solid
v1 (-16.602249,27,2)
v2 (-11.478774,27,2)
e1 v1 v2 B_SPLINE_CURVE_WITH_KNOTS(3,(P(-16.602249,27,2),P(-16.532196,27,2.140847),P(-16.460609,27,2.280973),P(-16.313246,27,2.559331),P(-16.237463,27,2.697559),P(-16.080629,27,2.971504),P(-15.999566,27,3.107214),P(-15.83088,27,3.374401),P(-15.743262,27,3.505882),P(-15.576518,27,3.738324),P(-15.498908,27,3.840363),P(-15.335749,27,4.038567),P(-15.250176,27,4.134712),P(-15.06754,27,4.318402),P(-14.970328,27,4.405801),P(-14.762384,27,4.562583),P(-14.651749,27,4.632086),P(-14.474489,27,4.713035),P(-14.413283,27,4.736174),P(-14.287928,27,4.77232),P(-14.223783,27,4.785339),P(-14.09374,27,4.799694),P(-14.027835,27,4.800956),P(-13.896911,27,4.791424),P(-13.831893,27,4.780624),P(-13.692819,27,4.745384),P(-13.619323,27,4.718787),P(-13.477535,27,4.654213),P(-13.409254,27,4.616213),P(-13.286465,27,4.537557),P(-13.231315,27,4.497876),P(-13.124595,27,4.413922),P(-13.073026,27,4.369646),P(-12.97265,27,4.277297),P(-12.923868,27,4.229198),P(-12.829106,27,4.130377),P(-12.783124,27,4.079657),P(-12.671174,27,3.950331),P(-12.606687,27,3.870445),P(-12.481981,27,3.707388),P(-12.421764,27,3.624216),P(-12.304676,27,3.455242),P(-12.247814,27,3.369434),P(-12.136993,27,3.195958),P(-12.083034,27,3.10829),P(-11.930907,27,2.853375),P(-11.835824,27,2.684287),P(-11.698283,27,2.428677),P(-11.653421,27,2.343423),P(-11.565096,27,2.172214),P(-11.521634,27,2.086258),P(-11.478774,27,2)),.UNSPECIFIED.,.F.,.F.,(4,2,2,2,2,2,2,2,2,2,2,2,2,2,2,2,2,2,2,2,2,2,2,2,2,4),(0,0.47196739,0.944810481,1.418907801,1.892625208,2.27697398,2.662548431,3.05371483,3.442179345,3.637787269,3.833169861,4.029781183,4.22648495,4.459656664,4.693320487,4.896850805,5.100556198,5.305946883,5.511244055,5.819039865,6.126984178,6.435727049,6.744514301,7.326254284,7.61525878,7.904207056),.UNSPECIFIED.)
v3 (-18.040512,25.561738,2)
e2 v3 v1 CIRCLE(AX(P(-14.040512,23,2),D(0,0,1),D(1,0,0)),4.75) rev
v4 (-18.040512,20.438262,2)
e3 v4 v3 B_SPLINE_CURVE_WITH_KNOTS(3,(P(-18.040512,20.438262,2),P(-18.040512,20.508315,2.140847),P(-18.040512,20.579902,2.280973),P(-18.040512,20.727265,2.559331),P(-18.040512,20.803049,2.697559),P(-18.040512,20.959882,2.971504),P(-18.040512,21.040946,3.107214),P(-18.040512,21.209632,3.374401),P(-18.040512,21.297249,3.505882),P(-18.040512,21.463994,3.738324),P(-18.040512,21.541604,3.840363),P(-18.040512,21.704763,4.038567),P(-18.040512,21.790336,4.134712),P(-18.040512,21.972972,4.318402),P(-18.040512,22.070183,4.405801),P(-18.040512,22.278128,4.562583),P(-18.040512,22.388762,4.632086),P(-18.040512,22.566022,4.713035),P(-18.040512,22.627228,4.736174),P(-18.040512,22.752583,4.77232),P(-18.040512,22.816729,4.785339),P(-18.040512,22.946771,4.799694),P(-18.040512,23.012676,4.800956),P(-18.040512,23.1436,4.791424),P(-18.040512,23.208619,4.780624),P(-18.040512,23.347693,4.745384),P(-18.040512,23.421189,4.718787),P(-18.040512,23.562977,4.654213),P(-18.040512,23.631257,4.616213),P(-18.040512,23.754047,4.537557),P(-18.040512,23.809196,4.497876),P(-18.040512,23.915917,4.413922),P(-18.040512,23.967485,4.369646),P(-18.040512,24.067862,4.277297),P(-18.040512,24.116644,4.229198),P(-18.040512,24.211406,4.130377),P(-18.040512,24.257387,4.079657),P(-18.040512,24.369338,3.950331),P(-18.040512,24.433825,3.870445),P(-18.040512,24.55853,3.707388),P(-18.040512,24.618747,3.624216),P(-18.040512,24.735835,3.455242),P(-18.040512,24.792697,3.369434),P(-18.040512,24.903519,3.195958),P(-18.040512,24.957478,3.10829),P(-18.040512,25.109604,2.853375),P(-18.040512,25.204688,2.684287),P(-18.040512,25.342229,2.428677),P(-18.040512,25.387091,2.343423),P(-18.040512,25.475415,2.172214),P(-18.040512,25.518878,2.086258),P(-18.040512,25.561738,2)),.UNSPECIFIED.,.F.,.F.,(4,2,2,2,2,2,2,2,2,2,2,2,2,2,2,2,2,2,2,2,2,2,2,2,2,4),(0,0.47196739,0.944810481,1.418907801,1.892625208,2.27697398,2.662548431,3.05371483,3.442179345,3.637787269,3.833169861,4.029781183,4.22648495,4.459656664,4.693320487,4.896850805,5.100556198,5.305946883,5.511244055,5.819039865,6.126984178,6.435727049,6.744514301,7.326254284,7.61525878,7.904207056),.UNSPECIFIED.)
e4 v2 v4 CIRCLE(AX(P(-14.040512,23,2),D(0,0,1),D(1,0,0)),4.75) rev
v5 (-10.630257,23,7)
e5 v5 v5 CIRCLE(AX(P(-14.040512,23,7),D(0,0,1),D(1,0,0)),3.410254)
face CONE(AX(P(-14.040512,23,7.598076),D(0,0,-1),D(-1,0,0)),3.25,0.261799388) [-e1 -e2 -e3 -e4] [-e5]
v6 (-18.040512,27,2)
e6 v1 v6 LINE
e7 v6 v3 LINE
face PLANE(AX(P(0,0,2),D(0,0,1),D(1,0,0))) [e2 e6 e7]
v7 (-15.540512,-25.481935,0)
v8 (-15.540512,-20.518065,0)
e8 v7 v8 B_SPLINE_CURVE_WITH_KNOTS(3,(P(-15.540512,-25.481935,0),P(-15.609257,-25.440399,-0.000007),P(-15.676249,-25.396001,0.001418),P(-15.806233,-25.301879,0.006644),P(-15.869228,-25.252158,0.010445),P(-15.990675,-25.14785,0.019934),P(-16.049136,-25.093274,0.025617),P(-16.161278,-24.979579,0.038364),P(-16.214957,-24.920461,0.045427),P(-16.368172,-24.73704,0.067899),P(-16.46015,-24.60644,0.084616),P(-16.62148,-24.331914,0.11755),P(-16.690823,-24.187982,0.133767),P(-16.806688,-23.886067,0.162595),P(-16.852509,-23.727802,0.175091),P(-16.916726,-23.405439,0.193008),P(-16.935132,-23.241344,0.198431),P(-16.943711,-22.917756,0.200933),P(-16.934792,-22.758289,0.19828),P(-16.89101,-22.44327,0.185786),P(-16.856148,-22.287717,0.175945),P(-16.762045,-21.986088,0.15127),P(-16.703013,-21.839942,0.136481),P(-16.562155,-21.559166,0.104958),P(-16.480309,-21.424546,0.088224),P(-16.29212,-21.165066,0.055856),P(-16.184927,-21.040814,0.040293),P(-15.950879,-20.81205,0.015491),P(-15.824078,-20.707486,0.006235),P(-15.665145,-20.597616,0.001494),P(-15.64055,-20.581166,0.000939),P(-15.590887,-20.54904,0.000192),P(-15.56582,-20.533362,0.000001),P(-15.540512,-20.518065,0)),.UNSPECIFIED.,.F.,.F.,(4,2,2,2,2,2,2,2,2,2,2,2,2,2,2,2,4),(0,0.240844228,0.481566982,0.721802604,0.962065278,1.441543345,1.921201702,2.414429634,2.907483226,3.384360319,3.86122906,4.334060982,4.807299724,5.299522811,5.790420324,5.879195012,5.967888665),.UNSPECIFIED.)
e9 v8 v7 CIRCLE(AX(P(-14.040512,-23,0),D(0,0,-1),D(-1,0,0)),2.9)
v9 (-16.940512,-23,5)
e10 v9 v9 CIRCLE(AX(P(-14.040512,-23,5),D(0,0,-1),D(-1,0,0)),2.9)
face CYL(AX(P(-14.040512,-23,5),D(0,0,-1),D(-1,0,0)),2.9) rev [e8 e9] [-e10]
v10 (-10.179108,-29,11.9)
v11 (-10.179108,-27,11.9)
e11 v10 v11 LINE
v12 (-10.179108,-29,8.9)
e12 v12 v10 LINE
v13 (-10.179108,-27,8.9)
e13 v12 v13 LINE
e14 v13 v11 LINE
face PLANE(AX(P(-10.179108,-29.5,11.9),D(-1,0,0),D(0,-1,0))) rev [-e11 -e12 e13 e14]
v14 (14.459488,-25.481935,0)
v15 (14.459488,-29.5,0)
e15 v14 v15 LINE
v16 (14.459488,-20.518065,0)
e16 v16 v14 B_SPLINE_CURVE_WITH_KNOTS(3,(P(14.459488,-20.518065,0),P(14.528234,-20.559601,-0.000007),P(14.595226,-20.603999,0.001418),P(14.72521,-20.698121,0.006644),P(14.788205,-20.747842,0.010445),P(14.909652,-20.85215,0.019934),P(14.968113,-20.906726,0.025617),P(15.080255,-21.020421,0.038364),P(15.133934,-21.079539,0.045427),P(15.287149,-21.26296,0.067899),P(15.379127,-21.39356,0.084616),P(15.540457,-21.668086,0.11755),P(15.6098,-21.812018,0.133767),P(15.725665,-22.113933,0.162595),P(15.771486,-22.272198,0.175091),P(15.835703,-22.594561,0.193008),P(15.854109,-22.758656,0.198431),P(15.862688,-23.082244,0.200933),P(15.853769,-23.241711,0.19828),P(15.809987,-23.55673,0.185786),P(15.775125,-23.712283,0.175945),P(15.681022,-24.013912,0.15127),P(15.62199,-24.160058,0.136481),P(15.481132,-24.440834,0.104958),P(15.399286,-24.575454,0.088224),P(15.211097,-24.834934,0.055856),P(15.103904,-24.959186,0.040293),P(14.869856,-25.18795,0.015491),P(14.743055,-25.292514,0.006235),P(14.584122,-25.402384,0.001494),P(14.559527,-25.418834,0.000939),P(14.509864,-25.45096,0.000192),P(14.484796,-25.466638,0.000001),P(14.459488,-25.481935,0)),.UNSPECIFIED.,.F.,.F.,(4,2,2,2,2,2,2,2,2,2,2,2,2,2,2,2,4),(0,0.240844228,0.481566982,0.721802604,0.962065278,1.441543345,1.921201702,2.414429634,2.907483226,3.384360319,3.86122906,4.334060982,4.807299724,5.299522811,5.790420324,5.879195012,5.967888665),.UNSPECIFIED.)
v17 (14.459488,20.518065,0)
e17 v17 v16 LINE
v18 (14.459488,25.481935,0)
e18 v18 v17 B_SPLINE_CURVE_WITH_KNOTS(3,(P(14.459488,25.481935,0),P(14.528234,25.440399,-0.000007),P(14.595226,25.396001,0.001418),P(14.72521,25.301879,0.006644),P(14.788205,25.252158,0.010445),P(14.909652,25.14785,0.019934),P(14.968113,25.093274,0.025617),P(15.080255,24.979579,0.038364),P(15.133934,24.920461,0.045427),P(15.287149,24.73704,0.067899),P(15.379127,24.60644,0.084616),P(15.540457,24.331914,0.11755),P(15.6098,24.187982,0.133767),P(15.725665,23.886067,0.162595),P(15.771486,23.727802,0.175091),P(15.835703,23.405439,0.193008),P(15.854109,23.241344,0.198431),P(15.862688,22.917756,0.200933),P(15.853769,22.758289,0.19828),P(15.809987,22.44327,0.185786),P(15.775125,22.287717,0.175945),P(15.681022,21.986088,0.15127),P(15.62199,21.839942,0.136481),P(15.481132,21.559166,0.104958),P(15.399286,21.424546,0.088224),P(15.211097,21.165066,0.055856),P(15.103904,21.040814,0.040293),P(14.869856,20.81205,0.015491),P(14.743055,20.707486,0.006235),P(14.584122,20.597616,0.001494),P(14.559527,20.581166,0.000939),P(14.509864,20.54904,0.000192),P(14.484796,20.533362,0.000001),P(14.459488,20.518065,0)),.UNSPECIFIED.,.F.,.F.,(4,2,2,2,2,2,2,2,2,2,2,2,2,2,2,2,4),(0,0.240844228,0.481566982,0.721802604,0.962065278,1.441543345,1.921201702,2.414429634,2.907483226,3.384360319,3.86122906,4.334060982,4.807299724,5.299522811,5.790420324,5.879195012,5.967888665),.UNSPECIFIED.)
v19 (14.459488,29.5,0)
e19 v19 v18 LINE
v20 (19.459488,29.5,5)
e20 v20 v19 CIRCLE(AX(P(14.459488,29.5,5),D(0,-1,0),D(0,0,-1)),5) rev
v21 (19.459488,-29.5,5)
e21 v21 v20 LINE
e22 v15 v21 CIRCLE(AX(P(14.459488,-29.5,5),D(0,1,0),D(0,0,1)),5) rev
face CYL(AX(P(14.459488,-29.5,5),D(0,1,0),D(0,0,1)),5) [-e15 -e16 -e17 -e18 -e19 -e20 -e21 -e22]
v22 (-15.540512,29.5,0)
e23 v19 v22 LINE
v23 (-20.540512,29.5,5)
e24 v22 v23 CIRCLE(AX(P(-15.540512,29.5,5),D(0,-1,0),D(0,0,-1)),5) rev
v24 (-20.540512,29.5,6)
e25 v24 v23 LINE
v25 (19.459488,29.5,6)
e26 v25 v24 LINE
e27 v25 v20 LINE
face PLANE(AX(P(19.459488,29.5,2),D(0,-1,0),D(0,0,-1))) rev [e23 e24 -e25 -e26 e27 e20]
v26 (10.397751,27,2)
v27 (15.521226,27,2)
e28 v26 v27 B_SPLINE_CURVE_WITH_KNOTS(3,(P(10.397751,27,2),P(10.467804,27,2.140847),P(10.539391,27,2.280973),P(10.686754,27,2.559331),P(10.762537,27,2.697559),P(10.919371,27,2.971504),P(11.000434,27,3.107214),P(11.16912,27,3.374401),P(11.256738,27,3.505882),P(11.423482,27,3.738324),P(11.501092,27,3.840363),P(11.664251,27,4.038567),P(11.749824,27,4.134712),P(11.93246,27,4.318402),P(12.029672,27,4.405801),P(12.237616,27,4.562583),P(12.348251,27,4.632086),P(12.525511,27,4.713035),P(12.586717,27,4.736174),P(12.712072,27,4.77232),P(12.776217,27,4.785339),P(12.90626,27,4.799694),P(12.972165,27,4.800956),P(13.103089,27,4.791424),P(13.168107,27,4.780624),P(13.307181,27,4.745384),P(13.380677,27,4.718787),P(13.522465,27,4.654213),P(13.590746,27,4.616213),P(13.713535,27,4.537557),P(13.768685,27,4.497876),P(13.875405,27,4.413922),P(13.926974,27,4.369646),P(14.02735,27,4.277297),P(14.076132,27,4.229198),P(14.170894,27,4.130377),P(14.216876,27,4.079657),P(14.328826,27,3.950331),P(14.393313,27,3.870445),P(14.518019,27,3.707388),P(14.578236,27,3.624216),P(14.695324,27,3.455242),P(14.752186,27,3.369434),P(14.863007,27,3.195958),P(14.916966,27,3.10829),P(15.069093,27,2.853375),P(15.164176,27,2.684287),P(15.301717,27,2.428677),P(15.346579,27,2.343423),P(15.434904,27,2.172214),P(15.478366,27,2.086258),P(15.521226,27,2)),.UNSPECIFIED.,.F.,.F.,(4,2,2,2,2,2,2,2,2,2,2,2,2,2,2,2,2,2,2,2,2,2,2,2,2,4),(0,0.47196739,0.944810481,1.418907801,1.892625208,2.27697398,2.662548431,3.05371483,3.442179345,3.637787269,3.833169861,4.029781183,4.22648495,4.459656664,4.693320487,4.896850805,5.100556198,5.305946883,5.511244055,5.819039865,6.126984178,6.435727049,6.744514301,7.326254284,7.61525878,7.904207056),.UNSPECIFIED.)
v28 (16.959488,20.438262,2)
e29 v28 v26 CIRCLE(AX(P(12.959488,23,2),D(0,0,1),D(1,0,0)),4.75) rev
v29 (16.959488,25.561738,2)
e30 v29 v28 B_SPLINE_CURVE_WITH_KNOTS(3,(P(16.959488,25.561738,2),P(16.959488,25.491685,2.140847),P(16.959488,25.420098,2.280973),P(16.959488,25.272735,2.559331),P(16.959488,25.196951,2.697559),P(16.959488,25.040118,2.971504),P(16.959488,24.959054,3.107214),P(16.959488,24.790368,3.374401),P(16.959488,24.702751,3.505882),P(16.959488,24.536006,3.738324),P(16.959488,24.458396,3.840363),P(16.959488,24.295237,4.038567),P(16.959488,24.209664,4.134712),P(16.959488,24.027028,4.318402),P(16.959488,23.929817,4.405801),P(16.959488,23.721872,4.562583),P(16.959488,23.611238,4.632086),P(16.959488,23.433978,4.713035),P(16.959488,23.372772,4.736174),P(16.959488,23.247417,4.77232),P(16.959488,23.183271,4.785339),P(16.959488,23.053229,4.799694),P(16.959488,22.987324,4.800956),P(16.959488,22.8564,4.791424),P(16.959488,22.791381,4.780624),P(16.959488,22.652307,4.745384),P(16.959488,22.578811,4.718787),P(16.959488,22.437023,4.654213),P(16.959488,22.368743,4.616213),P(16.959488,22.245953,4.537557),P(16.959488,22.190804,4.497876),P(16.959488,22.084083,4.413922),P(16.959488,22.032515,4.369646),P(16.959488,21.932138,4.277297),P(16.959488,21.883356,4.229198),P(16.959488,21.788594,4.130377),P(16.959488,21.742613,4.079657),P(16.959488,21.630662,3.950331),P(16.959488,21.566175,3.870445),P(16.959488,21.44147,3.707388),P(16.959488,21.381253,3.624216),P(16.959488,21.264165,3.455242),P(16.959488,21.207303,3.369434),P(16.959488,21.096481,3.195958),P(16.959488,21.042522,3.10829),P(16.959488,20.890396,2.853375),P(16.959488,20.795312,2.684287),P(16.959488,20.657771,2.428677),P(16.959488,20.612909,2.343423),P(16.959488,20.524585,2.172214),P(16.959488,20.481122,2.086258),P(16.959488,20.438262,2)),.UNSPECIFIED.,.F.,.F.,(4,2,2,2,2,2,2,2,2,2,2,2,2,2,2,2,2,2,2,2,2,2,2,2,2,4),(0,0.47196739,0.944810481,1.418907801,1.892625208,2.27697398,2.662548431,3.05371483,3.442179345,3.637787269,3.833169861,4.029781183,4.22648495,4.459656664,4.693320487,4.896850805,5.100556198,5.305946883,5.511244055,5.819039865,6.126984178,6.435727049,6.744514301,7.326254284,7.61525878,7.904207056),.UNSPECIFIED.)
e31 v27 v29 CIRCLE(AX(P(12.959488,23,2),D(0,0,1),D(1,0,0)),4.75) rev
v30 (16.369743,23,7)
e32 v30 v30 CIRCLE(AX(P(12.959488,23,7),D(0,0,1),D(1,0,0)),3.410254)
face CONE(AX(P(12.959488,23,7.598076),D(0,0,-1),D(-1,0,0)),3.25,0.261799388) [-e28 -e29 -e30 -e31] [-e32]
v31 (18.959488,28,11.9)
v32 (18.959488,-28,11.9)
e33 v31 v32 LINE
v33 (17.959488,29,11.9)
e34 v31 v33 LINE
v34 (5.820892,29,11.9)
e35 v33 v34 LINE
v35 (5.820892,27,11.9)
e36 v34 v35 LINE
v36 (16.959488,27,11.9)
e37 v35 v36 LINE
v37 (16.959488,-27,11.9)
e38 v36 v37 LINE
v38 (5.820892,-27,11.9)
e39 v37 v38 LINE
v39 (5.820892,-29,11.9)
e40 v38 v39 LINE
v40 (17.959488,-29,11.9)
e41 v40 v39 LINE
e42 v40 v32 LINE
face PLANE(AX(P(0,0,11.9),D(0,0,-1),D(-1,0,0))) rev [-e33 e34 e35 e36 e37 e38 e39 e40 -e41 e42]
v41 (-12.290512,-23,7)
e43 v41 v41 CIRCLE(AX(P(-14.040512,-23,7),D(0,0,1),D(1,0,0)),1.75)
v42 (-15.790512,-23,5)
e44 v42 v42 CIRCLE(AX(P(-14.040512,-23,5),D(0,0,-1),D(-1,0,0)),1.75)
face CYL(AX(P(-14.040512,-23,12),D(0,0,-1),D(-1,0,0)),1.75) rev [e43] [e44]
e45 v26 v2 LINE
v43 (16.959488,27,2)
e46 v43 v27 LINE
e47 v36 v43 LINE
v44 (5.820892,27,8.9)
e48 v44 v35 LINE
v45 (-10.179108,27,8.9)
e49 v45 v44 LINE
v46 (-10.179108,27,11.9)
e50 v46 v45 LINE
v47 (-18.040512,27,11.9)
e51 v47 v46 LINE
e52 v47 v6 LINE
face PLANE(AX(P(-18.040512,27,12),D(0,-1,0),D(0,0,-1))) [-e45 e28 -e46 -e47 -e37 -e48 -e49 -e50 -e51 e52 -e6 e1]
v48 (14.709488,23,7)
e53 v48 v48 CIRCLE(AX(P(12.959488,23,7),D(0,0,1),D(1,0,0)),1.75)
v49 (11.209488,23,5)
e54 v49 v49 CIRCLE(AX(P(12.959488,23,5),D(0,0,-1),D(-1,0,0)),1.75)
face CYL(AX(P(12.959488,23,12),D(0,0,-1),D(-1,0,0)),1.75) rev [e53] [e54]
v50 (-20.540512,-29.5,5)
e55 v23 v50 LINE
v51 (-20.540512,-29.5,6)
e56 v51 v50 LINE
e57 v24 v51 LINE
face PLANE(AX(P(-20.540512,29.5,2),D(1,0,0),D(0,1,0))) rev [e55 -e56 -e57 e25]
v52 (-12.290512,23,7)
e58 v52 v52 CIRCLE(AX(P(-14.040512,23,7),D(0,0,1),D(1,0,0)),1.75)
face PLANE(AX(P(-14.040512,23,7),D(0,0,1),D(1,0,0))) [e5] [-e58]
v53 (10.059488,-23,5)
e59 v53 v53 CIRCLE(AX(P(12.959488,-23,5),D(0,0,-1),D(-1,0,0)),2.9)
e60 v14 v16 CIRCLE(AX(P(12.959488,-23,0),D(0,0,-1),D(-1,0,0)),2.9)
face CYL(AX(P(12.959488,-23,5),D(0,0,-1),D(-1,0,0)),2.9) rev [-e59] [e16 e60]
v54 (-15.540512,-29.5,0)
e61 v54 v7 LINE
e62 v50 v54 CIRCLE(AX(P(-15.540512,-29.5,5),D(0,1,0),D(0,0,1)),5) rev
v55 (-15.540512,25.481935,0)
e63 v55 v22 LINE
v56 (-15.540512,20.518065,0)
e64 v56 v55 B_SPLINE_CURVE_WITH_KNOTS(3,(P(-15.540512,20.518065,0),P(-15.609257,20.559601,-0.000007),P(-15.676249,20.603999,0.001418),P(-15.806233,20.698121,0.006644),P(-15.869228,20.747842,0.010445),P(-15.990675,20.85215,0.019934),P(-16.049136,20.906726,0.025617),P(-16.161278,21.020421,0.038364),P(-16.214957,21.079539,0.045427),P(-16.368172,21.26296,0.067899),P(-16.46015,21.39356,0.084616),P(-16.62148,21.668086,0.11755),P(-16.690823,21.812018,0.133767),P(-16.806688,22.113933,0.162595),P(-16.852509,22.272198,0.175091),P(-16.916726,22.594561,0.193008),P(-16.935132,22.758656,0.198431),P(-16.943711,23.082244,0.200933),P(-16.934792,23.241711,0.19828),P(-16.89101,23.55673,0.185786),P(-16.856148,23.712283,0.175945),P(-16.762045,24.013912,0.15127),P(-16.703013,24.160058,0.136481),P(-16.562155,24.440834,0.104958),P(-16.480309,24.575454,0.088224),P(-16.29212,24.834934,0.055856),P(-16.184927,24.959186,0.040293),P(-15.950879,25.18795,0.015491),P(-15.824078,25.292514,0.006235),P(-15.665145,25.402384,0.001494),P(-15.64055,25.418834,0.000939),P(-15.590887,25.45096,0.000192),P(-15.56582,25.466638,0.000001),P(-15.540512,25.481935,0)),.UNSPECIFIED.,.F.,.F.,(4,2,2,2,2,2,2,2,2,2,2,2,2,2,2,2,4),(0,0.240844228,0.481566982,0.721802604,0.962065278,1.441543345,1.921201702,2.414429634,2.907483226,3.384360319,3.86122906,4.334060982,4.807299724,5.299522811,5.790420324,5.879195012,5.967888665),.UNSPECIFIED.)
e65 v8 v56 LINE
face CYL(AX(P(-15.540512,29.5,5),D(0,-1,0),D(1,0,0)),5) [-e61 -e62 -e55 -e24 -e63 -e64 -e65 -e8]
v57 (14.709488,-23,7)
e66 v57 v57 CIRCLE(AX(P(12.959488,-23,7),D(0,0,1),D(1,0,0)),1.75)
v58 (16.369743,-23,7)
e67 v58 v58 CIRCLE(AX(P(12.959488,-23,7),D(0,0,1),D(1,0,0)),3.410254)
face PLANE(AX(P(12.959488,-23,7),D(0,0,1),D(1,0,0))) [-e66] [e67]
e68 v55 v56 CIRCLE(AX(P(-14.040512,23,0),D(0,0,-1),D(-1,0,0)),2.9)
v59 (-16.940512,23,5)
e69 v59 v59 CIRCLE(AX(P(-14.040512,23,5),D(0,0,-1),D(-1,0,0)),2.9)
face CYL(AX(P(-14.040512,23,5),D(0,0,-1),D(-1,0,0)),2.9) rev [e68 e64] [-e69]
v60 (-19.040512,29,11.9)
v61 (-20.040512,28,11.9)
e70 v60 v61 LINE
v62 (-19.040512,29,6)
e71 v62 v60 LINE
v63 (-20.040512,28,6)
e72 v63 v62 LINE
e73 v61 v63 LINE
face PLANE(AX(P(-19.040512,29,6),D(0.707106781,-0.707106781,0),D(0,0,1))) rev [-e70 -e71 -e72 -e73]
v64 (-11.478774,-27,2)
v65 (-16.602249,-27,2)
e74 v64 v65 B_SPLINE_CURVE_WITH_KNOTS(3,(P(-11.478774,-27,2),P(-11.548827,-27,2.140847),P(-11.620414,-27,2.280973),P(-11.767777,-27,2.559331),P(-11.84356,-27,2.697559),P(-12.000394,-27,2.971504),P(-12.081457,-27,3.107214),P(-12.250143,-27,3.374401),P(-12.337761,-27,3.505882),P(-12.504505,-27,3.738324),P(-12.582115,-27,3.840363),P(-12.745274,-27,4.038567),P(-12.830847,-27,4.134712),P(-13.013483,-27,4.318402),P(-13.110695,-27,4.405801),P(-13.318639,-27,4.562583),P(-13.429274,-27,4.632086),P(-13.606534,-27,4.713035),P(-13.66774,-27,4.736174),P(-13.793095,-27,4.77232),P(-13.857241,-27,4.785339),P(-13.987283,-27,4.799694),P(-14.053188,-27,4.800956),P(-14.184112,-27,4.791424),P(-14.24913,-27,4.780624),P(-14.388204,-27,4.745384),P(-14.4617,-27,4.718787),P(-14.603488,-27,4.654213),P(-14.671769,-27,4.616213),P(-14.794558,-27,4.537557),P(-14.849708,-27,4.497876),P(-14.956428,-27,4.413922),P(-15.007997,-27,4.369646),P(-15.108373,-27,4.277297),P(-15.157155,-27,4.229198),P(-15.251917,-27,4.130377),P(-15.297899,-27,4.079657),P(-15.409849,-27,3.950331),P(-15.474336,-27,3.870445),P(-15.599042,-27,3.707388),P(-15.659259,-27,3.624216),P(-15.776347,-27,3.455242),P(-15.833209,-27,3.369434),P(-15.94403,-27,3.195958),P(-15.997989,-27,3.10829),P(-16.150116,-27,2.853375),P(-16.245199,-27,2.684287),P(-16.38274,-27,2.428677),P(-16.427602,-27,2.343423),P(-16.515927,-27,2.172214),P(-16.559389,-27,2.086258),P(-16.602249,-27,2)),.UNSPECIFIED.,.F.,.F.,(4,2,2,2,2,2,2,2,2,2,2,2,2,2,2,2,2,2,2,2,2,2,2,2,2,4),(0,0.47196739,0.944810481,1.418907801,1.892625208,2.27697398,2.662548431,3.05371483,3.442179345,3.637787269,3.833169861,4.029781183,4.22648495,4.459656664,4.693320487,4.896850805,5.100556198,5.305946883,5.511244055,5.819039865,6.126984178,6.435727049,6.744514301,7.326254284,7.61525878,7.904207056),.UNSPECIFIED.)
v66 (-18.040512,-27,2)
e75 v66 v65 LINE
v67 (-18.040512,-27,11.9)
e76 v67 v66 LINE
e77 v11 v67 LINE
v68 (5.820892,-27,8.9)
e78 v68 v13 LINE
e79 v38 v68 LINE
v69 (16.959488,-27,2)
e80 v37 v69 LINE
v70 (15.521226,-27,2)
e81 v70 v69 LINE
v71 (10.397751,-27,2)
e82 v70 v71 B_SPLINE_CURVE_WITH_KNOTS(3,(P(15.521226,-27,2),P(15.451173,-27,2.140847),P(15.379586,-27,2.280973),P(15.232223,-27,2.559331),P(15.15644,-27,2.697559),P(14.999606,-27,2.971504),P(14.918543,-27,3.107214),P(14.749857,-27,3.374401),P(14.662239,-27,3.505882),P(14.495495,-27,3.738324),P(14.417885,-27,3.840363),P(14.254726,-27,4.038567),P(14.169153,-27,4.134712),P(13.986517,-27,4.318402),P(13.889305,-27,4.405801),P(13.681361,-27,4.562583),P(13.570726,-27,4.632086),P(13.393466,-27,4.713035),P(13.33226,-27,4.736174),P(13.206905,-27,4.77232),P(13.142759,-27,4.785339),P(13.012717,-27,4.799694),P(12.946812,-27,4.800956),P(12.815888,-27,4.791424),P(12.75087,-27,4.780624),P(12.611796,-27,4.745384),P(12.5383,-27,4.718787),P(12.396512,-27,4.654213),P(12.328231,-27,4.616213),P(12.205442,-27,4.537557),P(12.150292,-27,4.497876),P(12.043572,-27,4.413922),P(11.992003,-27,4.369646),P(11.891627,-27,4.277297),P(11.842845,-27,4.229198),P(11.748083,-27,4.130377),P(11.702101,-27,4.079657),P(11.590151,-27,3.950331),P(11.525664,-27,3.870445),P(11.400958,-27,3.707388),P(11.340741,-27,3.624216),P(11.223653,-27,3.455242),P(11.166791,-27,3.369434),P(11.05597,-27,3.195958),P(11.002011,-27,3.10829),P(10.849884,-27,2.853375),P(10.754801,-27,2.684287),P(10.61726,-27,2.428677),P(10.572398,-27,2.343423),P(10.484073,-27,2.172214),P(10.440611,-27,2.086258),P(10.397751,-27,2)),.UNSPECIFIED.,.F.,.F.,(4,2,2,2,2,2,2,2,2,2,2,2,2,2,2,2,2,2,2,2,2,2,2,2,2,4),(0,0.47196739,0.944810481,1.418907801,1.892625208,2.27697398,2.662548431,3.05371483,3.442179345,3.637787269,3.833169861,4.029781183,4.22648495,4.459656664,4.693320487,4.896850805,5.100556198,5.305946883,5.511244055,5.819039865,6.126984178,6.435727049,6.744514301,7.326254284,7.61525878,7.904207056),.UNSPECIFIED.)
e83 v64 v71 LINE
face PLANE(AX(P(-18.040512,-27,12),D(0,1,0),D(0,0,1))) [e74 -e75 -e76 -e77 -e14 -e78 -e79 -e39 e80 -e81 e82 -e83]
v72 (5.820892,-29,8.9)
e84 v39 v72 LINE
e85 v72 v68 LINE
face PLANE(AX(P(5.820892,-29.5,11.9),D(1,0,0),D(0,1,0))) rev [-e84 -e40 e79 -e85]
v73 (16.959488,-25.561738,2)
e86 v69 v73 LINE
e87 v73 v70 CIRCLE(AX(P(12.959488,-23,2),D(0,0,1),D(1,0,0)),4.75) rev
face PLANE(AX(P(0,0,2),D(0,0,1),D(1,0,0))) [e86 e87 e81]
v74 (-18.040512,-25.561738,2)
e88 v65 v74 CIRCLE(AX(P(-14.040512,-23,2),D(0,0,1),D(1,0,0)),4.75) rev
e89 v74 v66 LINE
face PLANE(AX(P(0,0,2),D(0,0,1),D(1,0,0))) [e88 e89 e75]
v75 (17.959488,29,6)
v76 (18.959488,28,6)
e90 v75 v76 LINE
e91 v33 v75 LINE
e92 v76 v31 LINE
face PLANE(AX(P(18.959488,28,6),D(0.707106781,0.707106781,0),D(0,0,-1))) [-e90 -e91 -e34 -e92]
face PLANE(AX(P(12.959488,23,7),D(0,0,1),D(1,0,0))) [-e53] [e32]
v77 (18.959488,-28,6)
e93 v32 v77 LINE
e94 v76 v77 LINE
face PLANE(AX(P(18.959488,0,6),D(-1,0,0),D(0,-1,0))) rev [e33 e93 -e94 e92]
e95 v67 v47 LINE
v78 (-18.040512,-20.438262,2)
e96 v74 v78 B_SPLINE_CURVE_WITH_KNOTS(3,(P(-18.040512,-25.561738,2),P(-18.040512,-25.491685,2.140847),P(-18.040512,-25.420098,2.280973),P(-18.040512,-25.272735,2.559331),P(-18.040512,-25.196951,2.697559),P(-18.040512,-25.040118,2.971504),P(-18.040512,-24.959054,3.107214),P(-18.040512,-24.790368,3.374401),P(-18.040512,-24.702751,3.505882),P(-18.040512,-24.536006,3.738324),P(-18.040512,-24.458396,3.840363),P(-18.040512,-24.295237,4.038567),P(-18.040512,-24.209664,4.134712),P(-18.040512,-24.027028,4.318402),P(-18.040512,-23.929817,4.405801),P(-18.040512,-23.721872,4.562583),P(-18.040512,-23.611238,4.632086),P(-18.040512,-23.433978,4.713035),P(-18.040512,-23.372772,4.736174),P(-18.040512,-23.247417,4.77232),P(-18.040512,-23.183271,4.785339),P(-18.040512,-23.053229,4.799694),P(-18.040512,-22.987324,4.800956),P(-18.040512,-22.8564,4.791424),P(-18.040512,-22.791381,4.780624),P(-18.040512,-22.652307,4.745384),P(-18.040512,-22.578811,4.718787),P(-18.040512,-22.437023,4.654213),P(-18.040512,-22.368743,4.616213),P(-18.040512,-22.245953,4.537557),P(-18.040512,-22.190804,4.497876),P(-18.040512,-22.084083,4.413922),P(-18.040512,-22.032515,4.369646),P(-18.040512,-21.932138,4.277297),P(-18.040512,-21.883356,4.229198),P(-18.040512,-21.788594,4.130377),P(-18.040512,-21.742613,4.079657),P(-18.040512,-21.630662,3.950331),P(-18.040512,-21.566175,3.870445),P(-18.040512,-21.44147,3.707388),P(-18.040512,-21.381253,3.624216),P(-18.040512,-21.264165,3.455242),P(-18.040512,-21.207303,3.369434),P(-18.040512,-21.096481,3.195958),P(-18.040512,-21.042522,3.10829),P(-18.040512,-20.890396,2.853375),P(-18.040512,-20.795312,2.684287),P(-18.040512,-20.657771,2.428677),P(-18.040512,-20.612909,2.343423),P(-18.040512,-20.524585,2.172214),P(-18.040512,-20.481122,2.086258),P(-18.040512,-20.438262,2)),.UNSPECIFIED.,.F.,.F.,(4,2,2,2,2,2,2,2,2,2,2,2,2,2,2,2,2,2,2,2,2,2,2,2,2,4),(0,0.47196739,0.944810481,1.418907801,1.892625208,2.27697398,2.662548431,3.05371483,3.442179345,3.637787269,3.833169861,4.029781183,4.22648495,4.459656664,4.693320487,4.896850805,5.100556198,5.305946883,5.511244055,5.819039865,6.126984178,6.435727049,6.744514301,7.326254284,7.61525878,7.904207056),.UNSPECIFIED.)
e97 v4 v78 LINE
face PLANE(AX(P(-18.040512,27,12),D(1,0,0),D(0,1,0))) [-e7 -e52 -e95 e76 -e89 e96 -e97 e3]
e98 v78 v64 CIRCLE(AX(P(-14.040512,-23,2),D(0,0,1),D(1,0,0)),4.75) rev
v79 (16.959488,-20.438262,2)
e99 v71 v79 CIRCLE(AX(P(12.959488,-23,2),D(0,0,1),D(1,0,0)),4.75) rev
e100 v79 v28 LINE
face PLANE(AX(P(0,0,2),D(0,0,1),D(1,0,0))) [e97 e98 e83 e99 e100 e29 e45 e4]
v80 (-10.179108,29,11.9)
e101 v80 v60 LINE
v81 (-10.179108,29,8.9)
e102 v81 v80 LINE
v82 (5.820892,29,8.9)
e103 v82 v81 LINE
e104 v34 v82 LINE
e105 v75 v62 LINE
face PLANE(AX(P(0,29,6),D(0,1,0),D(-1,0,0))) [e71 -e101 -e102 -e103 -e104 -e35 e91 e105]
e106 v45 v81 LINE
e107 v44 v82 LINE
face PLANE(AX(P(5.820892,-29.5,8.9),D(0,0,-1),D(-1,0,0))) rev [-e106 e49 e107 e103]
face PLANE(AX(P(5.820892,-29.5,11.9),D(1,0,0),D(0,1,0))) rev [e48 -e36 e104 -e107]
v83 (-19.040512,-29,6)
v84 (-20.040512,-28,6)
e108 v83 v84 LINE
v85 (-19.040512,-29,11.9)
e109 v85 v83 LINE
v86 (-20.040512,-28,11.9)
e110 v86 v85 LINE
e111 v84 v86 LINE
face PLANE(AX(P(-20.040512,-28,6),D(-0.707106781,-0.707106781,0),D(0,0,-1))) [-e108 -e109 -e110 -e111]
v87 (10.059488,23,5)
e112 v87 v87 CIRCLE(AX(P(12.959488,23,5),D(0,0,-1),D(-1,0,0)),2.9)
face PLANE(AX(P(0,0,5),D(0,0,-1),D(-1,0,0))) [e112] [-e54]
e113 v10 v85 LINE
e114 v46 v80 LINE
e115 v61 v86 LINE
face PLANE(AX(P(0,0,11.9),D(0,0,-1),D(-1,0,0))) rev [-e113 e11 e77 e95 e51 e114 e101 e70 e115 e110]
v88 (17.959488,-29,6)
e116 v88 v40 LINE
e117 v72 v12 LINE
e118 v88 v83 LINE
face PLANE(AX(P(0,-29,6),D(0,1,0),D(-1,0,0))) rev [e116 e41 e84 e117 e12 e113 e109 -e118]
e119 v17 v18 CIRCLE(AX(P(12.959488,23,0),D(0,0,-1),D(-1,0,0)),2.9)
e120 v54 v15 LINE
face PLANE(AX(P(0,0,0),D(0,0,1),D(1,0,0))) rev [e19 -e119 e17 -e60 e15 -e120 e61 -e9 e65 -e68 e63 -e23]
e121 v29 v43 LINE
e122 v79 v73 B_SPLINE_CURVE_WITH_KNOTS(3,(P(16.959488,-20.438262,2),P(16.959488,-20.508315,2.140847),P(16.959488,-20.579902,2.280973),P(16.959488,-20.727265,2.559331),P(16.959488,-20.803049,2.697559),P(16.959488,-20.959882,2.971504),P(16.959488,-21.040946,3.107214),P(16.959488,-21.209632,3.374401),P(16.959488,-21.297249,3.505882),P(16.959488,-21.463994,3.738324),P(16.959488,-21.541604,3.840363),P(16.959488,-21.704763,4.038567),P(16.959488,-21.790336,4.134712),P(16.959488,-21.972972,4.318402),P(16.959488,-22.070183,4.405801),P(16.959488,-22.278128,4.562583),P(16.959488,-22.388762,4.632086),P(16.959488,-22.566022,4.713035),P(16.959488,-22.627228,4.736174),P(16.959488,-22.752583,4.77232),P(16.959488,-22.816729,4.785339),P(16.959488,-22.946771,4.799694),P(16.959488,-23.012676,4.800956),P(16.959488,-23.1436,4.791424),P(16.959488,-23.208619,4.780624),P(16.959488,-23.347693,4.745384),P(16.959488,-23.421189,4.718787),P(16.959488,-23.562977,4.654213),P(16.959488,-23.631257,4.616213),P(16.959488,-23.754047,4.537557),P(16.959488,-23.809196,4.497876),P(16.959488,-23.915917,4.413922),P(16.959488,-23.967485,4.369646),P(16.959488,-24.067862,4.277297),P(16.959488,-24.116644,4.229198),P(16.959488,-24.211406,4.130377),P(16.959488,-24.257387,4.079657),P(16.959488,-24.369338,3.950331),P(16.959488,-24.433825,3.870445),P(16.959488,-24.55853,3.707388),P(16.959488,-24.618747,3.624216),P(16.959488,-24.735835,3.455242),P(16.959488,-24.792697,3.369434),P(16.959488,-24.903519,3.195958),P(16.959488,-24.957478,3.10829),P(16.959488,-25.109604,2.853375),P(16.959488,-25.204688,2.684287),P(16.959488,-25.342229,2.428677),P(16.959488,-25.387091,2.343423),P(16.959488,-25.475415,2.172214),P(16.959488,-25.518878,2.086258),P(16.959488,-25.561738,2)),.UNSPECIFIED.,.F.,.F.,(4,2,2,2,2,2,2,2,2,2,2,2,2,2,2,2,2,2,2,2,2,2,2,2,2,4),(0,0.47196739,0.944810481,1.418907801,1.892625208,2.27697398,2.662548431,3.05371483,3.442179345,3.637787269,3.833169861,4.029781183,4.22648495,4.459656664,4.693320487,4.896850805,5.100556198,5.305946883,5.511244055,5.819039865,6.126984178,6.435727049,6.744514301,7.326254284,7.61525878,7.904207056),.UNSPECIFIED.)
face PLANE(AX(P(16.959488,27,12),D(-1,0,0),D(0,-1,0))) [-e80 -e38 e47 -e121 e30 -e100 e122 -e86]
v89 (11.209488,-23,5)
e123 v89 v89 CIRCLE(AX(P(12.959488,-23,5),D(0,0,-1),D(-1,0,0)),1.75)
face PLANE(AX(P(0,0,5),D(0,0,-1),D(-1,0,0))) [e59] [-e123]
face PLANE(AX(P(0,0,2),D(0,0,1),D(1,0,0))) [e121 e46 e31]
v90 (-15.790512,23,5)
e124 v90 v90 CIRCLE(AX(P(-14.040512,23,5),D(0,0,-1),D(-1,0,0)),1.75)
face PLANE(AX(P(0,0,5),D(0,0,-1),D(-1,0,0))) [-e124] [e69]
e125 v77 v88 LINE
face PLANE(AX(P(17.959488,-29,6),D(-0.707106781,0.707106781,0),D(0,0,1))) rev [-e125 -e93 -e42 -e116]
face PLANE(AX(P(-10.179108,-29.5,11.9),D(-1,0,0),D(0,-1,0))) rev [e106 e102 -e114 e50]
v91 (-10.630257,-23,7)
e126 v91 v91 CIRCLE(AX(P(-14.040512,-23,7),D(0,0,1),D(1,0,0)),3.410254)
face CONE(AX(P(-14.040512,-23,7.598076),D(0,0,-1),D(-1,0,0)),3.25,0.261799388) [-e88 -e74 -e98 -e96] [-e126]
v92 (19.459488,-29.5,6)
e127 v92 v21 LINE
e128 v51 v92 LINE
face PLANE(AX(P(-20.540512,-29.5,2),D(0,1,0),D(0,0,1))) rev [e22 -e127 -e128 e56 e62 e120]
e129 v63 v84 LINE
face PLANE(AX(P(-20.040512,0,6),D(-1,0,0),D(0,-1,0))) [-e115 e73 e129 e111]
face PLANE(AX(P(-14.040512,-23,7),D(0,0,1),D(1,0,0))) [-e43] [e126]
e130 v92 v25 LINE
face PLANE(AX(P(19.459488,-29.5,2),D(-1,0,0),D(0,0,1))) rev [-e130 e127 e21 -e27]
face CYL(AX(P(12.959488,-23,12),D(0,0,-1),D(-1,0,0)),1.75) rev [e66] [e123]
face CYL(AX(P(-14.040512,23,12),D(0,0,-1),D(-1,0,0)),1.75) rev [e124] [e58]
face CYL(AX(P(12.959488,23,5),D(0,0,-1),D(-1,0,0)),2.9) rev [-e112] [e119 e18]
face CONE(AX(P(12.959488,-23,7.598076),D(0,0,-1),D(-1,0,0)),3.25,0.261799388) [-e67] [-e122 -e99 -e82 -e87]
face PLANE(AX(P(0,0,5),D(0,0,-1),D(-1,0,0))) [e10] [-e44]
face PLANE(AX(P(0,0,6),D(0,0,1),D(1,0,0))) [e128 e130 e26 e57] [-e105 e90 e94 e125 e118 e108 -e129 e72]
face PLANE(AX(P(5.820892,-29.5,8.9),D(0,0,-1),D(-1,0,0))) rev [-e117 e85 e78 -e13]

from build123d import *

# Parameters (mm, degrees)
BASE_W              = 40
BASE_H              = 59
EXTRUDE_1_DEPTH     = 2
SKETCH_2_W          = 40
SKETCH_2_H          = 59
SKETCH_2_W_2        = 35
SKETCH_2_H_2        = 54
EXTRUDE_2_DEPTH     = 10
SKETCH_3_R          = 3.25
EXTRUDE_3_DEPTH     = 5
SKETCH_4_R          = 2.9
CUT_EXTRUDE_2_DEPTH = 5
CHAMFER_1_SIZE      = 1.5
CHAMFER_1_SIZE_2    = 5.598076211
SKETCH_6_R          = 1.75
CUT_EXTRUDE_3_DEPTH = 38.896736188
FILLET_1_R          = 5
SKETCH_7_W          = 40
SKETCH_7_H          = 59
SKETCH_7_W_2        = 39
SKETCH_7_H_2        = 58
CUT_EXTRUDE_6_DEPTH = 6
CHAMFER_2_SIZE      = 1
SKETCH_8_W          = 43.293299122
SKETCH_8_H          = 71.249143308
CUT_EXTRUDE_7_DEPTH = 0.1
SKETCH_9_W          = 16
SKETCH_9_H          = 3
CUT_EXTRUDE_8_DEPTH = 64.13297577


with BuildPart() as part:
    # base → Бобышка-Вытянуть1 (new body)
    with BuildSketch(Plane.XY):
        with Locations((-0.540511526, 0)):
            Rectangle(BASE_W, BASE_H)
    extrude(amount=EXTRUDE_1_DEPTH)

    # Эскиз2 → Бобышка-Вытянуть2 (add)
    with BuildSketch(Plane.XY.offset(2)):
        with Locations((-0.540511526, 0)):
            Rectangle(SKETCH_2_W, SKETCH_2_H)
        with Locations((-0.540511526, 0)):
            Rectangle(SKETCH_2_W_2, SKETCH_2_H_2, mode=Mode.SUBTRACT)
    extrude(amount=EXTRUDE_2_DEPTH)

    # Эскиз3 → Бобышка-Вытянуть3 (add)
    with BuildSketch(Plane.XY.offset(2)):
        with Locations((-14.040511526, -23)):
            Circle(SKETCH_3_R)
        with Locations((12.959488474, -23)):
            Circle(SKETCH_3_R)
        with Locations((12.959488474, 23)):
            Circle(SKETCH_3_R)
        with Locations((-14.040511526, 23)):
            Circle(SKETCH_3_R)
    extrude(amount=EXTRUDE_3_DEPTH)

    # Эскиз4 → Вырез-Вытянуть2 (cut)
    with BuildSketch(Plane(origin=(0, 0, 0), x_dir=(-1, 0, 0), z_dir=(0, 0, -1))):
        with Locations((14.040511526, -23)):
            Circle(SKETCH_4_R)
        with Locations((-12.959488474, -23)):
            Circle(SKETCH_4_R)
        with Locations((-12.959488474, 23)):
            Circle(SKETCH_4_R)
        with Locations((14.040511526, 23)):
            Circle(SKETCH_4_R)
    extrude(amount=-CUT_EXTRUDE_2_DEPTH, mode=Mode.SUBTRACT)

    # Фаска1
    # the kernel refuses this chamfer: 5.598076211, 1.5 mm, written as the material it adds along each edge
    with BuildSketch(Plane(origin=(-14.040511526, 23, 2), x_dir=(1, 0, 0), z_dir=(0, -1, 0))) as chamfer_1_piece_1_section:
        Polygon((3.25 + CHAMFER_1_SIZE, 0), (3.25, CHAMFER_1_SIZE_2), (3.25, 0), align=None)
    chamfer_1_piece_1 = revolve(axis=Axis((-14.040511526, 23, 2), (0, 0, 1)), mode=Mode.PRIVATE)
    chamfer_1_piece_1 = split(chamfer_1_piece_1, bisect_by=Plane(origin=(-14.040511526, 23, 7), z_dir=(0, 0, -1)), keep=Keep.TOP, mode=Mode.PRIVATE)
    add(chamfer_1_piece_1)
    with BuildSketch(Plane(origin=(12.959488474, 23, 2), x_dir=(1, 0, 0), z_dir=(0, -1, 0))) as chamfer_1_piece_2_section:
        Polygon((3.25 + CHAMFER_1_SIZE, 0), (3.25, CHAMFER_1_SIZE_2), (3.25, 0), align=None)
    chamfer_1_piece_2 = revolve(axis=Axis((12.959488474, 23, 2), (0, 0, 1)), mode=Mode.PRIVATE)
    chamfer_1_piece_2 = split(chamfer_1_piece_2, bisect_by=Plane(origin=(12.959488474, 23, 7), z_dir=(0, 0, -1)), keep=Keep.TOP, mode=Mode.PRIVATE)
    add(chamfer_1_piece_2)
    with BuildSketch(Plane(origin=(-14.040511526, -23, 2), x_dir=(1, 0, 0), z_dir=(0, -1, 0))) as chamfer_1_piece_3_section:
        Polygon((3.25 + CHAMFER_1_SIZE, 0), (3.25, CHAMFER_1_SIZE_2), (3.25, 0), align=None)
    chamfer_1_piece_3 = revolve(axis=Axis((-14.040511526, -23, 2), (0, 0, 1)), mode=Mode.PRIVATE)
    chamfer_1_piece_3 = split(chamfer_1_piece_3, bisect_by=Plane(origin=(-14.040511526, -23, 7), z_dir=(0, 0, -1)), keep=Keep.TOP, mode=Mode.PRIVATE)
    add(chamfer_1_piece_3)
    with BuildSketch(Plane(origin=(12.959488474, -23, 2), x_dir=(1, 0, 0), z_dir=(0, -1, 0))) as chamfer_1_piece_4_section:
        Polygon((3.25 + CHAMFER_1_SIZE, 0), (3.25, CHAMFER_1_SIZE_2), (3.25, 0), align=None)
    chamfer_1_piece_4 = revolve(axis=Axis((12.959488474, -23, 2), (0, 0, 1)), mode=Mode.PRIVATE)
    chamfer_1_piece_4 = split(chamfer_1_piece_4, bisect_by=Plane(origin=(12.959488474, -23, 7), z_dir=(0, 0, -1)), keep=Keep.TOP, mode=Mode.PRIVATE)
    add(chamfer_1_piece_4)

    # Эскиз6 → Вырез-Вытянуть3 (cut, through all)
    with BuildSketch(Plane(origin=(0, 0, 0), x_dir=(-1, 0, 0), z_dir=(0, 0, -1))):
        with Locations((-12.959488474, 23)):
            Circle(SKETCH_6_R)
        with Locations((14.040511526, 23)):
            Circle(SKETCH_6_R)
        with Locations((14.040511526, -23)):
            Circle(SKETCH_6_R)
        with Locations((-12.959488474, -23)):
            Circle(SKETCH_6_R)
    extrude(amount=-CUT_EXTRUDE_3_DEPTH, mode=Mode.SUBTRACT)

    # Скругление1
    # the kernel refuses this fillet: 5 mm, written as the material it takes off along each edge
    with BuildSketch(Plane(origin=(19.459488474, -42, 0), x_dir=(0, 0, 1), z_dir=(0, 1, 0)), Plane(origin=(-20.540511526, 42, 0), x_dir=(0, 0, 1), z_dir=(0, -1, 0))) as fillet_1_piece_1:
        with BuildLine():
            CenterArc((FILLET_1_R, -FILLET_1_R), FILLET_1_R, 90, 90)
            Line((0, -FILLET_1_R), (0, 0))
            Line((0, 0), (FILLET_1_R, 0))
        make_face()
    extrude(amount=84, mode=Mode.SUBTRACT)

    # Эскиз7 → Вырез-Вытянуть6 (cut)
    with BuildSketch(Plane.XY.offset(12)):
        with Locations((-0.540511526, 0)):
            Rectangle(SKETCH_7_W, SKETCH_7_H)
        with Locations((-0.540511526, 0)):
            Rectangle(SKETCH_7_W_2, SKETCH_7_H_2, mode=Mode.SUBTRACT)
    extrude(amount=-CUT_EXTRUDE_6_DEPTH, mode=Mode.SUBTRACT)

    # Фаска2
    chamfer_2_edges = [part.edges().sort_by_distance(p)[0] for p in [
        (-20.040511526, 29, 9),
        (-20.040511526, -29, 9),
        (18.959488474, -29, 9),
        (18.959488474, 29, 9),
    ]]
    chamfer(chamfer_2_edges, length=CHAMFER_2_SIZE)

    # Эскиз8 → Вырез-Вытянуть7 (cut)
    with BuildSketch(Plane.XY.offset(12)):
        with Locations((-1.042207714, -0.462672782)):
            Rectangle(SKETCH_8_W, SKETCH_8_H)
    extrude(amount=-CUT_EXTRUDE_7_DEPTH, mode=Mode.SUBTRACT)

    # Эскиз9 → Вырез-Вытянуть8 (cut, through all)
    with BuildSketch(Plane(origin=(0, 29, 0), x_dir=(1, 0, 0), z_dir=(0, 1, 0))):
        with Locations((-2.179108085, -10.4)):
            Rectangle(SKETCH_9_W, SKETCH_9_H)
    extrude(amount=-CUT_EXTRUDE_8_DEPTH, mode=Mode.SUBTRACT)


solid = part.part
